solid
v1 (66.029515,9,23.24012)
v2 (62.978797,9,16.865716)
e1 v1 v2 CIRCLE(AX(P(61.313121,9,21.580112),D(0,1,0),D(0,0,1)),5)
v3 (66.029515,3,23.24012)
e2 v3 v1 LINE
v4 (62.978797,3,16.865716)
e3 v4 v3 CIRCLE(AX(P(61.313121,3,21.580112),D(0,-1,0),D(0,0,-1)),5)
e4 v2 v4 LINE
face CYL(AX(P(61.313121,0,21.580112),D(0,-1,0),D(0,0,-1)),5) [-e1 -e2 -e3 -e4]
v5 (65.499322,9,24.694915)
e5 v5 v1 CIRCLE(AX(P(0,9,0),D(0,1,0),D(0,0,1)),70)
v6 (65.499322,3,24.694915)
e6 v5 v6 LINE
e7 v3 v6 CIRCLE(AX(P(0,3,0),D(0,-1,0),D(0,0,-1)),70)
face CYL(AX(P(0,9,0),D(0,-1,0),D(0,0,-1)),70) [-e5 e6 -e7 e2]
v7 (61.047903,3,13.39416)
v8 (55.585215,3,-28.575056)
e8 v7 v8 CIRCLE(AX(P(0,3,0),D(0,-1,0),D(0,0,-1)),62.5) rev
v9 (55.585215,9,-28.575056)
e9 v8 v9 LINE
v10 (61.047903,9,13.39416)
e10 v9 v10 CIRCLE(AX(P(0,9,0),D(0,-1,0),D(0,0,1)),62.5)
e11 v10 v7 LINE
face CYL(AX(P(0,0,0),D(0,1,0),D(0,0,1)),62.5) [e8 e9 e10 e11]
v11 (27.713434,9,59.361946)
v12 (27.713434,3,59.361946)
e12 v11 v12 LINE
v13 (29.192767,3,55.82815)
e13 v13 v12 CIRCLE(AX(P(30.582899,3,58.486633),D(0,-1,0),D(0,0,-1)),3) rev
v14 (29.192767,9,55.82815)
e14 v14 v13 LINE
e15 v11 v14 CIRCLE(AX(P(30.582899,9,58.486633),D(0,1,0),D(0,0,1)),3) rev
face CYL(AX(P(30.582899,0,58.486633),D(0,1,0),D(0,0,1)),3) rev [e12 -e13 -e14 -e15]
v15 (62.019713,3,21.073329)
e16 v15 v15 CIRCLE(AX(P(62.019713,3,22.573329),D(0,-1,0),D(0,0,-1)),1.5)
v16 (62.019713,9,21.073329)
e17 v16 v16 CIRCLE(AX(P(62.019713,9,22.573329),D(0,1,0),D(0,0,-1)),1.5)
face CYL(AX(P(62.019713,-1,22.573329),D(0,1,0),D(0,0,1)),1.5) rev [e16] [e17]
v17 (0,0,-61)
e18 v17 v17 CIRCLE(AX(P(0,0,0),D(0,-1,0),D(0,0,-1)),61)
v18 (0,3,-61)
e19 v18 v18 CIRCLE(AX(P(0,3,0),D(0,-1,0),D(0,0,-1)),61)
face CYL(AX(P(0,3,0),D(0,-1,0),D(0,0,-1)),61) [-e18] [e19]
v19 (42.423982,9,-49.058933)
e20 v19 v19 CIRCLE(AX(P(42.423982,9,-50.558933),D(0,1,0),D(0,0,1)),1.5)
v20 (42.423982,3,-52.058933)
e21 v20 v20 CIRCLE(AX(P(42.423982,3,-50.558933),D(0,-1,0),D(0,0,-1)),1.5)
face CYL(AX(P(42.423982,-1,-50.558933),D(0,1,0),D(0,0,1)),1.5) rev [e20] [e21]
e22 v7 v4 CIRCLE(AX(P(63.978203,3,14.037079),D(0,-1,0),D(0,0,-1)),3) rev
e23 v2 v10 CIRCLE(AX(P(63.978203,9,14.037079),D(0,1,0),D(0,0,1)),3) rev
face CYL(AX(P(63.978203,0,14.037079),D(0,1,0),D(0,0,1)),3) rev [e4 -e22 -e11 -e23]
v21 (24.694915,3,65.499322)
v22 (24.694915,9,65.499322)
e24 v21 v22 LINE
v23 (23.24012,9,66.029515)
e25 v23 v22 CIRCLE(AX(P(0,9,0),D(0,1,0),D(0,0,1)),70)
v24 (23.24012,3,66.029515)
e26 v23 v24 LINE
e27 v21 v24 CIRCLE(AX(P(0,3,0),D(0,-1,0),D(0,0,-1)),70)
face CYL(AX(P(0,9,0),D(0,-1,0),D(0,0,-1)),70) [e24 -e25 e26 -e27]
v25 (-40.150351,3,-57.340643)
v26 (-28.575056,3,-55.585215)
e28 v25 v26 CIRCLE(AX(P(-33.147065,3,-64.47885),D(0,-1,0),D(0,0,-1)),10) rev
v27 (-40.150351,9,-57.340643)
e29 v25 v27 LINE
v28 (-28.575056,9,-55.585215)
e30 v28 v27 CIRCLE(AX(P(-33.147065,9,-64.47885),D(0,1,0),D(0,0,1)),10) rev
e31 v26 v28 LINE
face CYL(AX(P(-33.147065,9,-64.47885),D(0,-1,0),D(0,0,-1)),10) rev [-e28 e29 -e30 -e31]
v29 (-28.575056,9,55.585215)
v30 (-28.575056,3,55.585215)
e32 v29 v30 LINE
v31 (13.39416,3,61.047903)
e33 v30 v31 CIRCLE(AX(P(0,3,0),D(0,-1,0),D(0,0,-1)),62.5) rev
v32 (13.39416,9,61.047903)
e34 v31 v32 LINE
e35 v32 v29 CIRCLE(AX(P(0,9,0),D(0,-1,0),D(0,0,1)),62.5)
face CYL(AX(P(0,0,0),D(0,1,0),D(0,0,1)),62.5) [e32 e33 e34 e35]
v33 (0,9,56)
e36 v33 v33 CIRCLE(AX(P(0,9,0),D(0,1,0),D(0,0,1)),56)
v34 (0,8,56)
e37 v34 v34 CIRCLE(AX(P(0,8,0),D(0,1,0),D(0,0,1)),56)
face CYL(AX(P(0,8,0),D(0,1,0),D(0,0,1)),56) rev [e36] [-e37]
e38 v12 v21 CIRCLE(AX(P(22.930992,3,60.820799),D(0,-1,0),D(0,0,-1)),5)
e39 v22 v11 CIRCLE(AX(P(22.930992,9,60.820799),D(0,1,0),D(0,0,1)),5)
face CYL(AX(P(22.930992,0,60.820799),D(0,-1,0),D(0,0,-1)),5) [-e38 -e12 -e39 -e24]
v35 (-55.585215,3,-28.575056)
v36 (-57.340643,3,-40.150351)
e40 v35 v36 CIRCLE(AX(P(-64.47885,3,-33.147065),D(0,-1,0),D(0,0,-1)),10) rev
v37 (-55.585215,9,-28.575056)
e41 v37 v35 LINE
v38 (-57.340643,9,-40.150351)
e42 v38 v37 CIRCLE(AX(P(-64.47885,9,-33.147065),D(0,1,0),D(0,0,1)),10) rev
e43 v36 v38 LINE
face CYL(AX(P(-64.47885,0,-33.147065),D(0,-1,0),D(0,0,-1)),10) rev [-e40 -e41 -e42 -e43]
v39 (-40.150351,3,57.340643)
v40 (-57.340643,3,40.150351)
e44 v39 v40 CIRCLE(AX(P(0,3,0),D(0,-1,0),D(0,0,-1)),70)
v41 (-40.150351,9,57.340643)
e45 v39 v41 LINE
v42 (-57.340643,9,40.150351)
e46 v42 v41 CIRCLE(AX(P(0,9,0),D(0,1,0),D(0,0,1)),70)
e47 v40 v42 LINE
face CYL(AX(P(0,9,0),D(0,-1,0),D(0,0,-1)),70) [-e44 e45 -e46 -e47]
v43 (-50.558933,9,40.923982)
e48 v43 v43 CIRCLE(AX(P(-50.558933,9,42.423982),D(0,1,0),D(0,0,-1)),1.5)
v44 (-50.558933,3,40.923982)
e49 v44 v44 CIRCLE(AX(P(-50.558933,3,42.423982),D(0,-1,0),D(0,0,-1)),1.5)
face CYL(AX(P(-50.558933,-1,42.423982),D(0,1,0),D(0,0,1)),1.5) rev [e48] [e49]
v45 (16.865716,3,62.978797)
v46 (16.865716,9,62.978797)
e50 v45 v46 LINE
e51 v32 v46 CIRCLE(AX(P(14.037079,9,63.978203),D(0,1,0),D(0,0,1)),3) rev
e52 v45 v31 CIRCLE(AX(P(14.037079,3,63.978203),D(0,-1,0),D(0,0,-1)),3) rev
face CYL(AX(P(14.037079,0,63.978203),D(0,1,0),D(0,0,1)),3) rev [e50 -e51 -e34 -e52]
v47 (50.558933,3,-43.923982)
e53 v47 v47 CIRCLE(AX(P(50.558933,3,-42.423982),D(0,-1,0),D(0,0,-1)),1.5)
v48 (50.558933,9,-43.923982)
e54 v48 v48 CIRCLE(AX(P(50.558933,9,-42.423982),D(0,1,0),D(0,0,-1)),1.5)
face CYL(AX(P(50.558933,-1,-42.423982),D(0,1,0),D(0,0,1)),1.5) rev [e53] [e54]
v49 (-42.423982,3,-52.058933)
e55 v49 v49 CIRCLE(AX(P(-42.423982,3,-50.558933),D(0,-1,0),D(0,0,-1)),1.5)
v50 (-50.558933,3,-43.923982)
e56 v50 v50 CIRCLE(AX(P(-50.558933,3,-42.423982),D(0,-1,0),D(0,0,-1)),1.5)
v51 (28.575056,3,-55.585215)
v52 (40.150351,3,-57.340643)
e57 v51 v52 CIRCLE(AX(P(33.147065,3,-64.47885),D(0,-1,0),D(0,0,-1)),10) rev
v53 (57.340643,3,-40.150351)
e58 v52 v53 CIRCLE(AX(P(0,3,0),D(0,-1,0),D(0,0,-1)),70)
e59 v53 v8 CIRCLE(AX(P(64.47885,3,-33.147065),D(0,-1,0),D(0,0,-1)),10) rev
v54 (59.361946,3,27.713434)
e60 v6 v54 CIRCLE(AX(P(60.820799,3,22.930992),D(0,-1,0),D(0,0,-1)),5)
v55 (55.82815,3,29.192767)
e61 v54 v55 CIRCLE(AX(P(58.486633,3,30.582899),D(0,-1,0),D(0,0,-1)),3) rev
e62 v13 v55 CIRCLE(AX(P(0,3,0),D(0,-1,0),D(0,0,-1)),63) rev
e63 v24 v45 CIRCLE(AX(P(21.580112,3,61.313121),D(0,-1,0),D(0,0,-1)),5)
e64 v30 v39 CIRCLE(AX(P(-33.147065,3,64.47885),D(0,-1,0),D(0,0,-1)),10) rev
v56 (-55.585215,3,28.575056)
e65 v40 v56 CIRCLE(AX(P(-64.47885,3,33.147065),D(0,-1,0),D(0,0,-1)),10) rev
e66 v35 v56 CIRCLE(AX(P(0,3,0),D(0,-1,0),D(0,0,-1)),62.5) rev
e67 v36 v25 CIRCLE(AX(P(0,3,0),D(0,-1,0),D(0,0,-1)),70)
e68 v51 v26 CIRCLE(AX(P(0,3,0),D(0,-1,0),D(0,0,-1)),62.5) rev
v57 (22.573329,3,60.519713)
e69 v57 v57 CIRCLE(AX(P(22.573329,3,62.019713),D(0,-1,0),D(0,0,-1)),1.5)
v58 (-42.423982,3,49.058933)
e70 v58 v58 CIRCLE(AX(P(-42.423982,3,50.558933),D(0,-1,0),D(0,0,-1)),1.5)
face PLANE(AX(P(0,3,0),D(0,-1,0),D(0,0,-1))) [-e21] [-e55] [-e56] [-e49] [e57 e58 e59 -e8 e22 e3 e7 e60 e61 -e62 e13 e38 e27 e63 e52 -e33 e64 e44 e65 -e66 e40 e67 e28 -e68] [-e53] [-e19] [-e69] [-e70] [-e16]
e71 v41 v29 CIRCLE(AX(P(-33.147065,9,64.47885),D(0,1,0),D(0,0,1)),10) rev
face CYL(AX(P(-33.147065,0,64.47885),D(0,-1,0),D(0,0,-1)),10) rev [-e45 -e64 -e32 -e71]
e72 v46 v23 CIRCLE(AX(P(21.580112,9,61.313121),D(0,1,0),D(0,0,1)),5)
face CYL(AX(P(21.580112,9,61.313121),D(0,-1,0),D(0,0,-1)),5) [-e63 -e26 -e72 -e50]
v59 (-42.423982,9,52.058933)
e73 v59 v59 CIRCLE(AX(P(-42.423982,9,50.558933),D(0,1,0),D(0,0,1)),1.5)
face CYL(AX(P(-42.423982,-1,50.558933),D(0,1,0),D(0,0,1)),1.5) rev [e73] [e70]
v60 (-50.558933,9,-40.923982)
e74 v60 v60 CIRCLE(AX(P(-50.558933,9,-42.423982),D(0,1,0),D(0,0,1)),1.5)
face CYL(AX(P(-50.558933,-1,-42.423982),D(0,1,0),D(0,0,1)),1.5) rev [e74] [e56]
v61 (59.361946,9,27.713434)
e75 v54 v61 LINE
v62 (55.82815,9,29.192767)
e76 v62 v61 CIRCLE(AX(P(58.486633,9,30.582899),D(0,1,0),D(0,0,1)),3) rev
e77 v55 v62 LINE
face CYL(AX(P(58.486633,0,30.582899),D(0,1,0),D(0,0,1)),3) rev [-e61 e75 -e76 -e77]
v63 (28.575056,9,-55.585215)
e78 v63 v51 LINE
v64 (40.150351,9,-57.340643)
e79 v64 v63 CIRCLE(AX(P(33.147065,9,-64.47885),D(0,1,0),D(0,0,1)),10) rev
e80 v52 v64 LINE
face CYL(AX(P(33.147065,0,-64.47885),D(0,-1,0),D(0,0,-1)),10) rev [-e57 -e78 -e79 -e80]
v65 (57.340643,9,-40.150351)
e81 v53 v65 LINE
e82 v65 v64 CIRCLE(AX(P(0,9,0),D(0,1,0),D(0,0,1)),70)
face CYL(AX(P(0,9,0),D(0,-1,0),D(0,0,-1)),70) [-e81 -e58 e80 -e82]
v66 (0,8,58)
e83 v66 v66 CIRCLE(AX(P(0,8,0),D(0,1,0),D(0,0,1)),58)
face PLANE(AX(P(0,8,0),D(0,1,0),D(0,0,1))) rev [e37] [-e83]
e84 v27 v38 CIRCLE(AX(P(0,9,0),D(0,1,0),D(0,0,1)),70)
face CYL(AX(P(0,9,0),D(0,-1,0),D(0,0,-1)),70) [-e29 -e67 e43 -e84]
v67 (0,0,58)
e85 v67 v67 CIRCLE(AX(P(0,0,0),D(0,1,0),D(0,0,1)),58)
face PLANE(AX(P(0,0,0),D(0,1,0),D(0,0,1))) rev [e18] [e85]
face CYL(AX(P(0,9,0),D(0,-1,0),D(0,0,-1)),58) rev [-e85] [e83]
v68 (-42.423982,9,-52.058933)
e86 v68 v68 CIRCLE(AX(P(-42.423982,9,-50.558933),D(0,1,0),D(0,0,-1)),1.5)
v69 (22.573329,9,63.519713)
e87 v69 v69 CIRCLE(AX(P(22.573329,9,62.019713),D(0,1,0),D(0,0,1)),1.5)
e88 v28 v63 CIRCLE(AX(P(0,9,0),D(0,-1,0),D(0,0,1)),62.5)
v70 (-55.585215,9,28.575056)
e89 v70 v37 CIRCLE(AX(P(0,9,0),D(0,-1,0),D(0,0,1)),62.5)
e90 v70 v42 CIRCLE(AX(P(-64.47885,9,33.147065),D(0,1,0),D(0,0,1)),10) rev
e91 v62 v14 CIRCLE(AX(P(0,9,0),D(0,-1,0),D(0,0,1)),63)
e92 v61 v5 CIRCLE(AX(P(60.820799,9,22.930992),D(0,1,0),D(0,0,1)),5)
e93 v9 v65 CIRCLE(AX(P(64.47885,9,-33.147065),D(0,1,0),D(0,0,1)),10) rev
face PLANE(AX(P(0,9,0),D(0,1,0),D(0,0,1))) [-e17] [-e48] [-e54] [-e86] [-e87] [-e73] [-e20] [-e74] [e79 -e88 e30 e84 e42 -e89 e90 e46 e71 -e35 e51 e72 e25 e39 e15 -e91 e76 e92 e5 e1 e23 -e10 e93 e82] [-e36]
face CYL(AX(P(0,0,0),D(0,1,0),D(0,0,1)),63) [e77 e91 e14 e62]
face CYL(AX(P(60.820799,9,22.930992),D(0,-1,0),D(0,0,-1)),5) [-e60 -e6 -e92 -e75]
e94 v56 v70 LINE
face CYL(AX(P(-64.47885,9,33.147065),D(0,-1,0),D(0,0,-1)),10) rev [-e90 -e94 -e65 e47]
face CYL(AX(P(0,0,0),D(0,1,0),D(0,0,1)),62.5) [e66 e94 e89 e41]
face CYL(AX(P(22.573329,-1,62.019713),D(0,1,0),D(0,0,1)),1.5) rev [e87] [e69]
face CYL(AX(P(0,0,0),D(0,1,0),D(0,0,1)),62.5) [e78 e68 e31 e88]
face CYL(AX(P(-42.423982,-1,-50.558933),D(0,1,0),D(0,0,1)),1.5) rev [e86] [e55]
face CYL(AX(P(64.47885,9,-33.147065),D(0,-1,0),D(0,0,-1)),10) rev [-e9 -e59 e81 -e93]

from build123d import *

# Parameters (mm, degrees)
SKETCH_1_R          = 70
SKETCH_1_R_2        = 58
EXTRUDE_1_DEPTH     = 9
SKETCH_3_R          = 70
SKETCH_3_R_2        = 61
CUT_EXTRUDE_2_DEPTH = 3
CUT_EXTRUDE_3_DEPTH = 100.403219264
FILLET_1_R          = 10
CUT_EXTRUDE_6_DEPTH = 97.044388064
FILLET_7_R          = 3
SKETCH_6_R          = 1.5
CUT_EXTRUDE_4_DEPTH = 10
FILLET_9_R          = 5
EXTRUDE_START       = -1
SKETCH_9_R          = 58
SKETCH_9_R_2        = 56
EXTRUDE_2_DEPTH     = 1


with BuildPart() as part:
    # 草图1 → 凸台-拉伸1 (new body)
    with BuildSketch(Plane(origin=(0, 0, 0), x_dir=(1, 0, 0), z_dir=(0, 1, 0))):
        with Locations(Location((0, 0, 0), (0, 0, 270))):
            Circle(SKETCH_1_R)
        with Locations(Location((0, 0, 0), (0, 0, 270))):
            Circle(SKETCH_1_R_2, mode=Mode.SUBTRACT)
    extrude(amount=EXTRUDE_1_DEPTH)

    # 草图3 → 切除-拉伸2 (cut)
    with BuildSketch(Plane.XZ):
        with Locations(Location((0, 0, 0), (0, 0, 270))):
            Circle(SKETCH_3_R)
        with Locations(Location((0, 0, 0), (0, 0, 270))):
            Circle(SKETCH_3_R_2, mode=Mode.SUBTRACT)
    extrude(amount=-CUT_EXTRUDE_2_DEPTH, mode=Mode.SUBTRACT)

    # 草图4 → 切除-拉伸3 (cut, through all)
    with BuildSketch(Plane(origin=(0, 9, 0), x_dir=(1, 0, 0), z_dir=(0, 1, 0))):
        with BuildLine():
            Line((35.848527272, 51.197002768), (40.150350545, 57.3406431))
            ThreePointArc((40.150350545, 57.3406431), (0, 70), (-40.150350545, 57.3406431))
            Line((-40.150350545, 57.3406431), (-35.848527272, 51.197002768))
            ThreePointArc((-35.848527272, 51.197002768), (0, 62.5), (35.848527272, 51.197002768))
        make_face()
        with BuildLine():
            Line((51.197002768, 35.848527272), (57.3406431, 40.150350545))
            ThreePointArc((57.3406431, 40.150350545), (68.936542711, 12.155372437), (67.61480784, -18.117333157))
            Line((67.61480784, -18.117333157), (60.370364143, -16.176190319))
            ThreePointArc((60.370364143, -16.176190319), (61.550484563, 10.853011104), (51.197002768, 35.848527272))
        make_face()
        with BuildLine():
            Line((16.176190319, -60.370364143), (18.117333157, -67.61480784))
            ThreePointArc((18.117333157, -67.61480784), (-12.155372437, -68.936542711), (-40.150350545, -57.3406431))
            Line((-40.150350545, -57.3406431), (-35.848527272, -51.197002768))
            ThreePointArc((-35.848527272, -51.197002768), (-10.853011104, -61.550484563), (16.176190319, -60.370364143))
        make_face()
        with BuildLine():
            Line((-51.197002768, -35.848527272), (-57.3406431, -40.150350545))
            ThreePointArc((-57.3406431, -40.150350545), (-70, 0), (-57.3406431, 40.150350545))
            Line((-57.3406431, 40.150350545), (-51.197002768, 35.848527272))
            ThreePointArc((-51.197002768, 35.848527272), (-62.5, 0), (-51.197002768, -35.848527272))
        make_face()
    extrude(amount=-CUT_EXTRUDE_3_DEPTH, mode=Mode.SUBTRACT)

    # 圆角1
    # the kernel refuses this fillet: 10 mm, written as the material it adds along each edge
    with BuildSketch(Plane(origin=(-51.197002768, 9, 35.848527272), x_dir=(-0.8191520442890221, 0, 0.5735764363510029), z_dir=(0, -1, 0)), Plane(origin=(51.197002768, 9, -35.848527272), x_dir=(0.8191520442890228, 0, -0.5735764363510018), z_dir=(0, -1, 0)), Plane(origin=(-35.848527272, 9, -51.197002768), x_dir=(-0.5735764363510008, 0, -0.8191520442890236), z_dir=(0, -1, 0))) as fillet_1_piece_1:
        with BuildLine():
            CenterArc((9.330357143, 9.831062645), FILLET_1_R, 187.793366371, 71.660001872)
            Line((-0.577278325, 8.475054004), (-0.775431034, 8.447933831))
            ThreePointArc((-0.775431034, 8.447933831), (-0.344024235, 4.233754448), (-0.2, 0))
            Line((-0.2, 0), (0, -0.2))
            ThreePointArc((0, -0.2), (3.75, -0.2), (7.463392857, -0.196621253))
            Line((7.463392857, -0.196621253), (7.5, 0))
        make_face()
    extrude(amount=6)
    with BuildSketch(Plane(origin=(-35.848527272, 9, 51.197002768), x_dir=(-0.5735764363510476, 0, 0.8191520442889907), z_dir=(0, -1, 0))) as fillet_1_piece_2:
        with BuildLine():
            CenterArc((9.330357143, -9.831062645), FILLET_1_R, 100.546631757, 71.660001872)
            Line((-0.577278325, -8.475054004), (-0.775431034, -8.447933831))
            ThreePointArc((-0.775431034, -8.447933831), (-0.344024235, -4.233754448), (-0.2, 0))
            Line((-0.2, 0), (0, 0.2))
            ThreePointArc((0, 0.2), (3.75, 0.2), (7.463392857, 0.196621253))
            Line((7.463392857, 0.196621253), (7.5, 0))
        make_face()
    extrude(amount=6)
    with BuildSketch(Plane(origin=(35.848527272, 9, -51.197002768), x_dir=(-0.8562371813975653, 0, -0.5165828967284464), z_dir=(0, -1, 0)), Plane(origin=(-51.197002768, 9, -35.848527272), x_dir=(-0.5165828967284464, 0, 0.8562371813975653), z_dir=(0, -1, 0))) as fillet_1_piece_3:
        with BuildLine():
            CenterArc((9.174267262, 9.976882145), FILLET_1_R, 194.443314943, 71.660001872)
            Line((-0.509681515, 7.482661609), (-0.70336049, 7.432777198))
            ThreePointArc((-0.70336049, 7.432777198), (-0.4543784, 3.727739297), (-0.199537643, -0.013591507))
            Line((-0.199537643, -0.013591507), (0.013591507, -0.199537643))
            ThreePointArc((0.013591507, -0.199537643), (4.247345955, -0.055513408), (8.481100403, -0.199537643))
            Line((8.481100403, -0.199537643), (8.49469191, 0))
        make_face()
    extrude(amount=6)

    # 草图8 → 切除-拉伸6 (cut, through all)
    with BuildSketch(Plane(origin=(0, 9, 0), x_dir=(1, 0, 0), z_dir=(0, 1, 0))):
        with BuildLine():
            Line((26.62495049, -57.097390583), (29.583278322, -63.441545093))
            ThreePointArc((29.583278322, -63.441545093), (49.497474683, -49.497474683), (63.441545093, -29.583278322))
            Line((63.441545093, -29.583278322), (57.097390583, -26.62495049))
            ThreePointArc((57.097390583, -26.62495049), (44.547727215, -44.547727215), (26.62495049, -57.097390583))
        make_face()
    extrude(amount=-CUT_EXTRUDE_6_DEPTH, mode=Mode.SUBTRACT)

    # 圆角7
    fillet_7_edges = [part.edges().sort_by_distance(p)[0] for p in [
        (26.62495049, 6, 57.097390583),
        (57.097390583, 6, 26.62495049),
        (60.370364143, 6, 16.176190319),
        (16.176190319, 6, 60.370364143),
    ]]
    fillet(fillet_7_edges, radius=FILLET_7_R)

    # 草图6 → 切除-拉伸4 (cut)
    with BuildSketch(Plane(origin=(0, 9, 0), x_dir=(1, 0, 0), z_dir=(0, 1, 0))):
        with Locations(Location((42.423982239, 50.558933246, 0), (0, 0, 270))):
            Circle(SKETCH_6_R)
        with Locations(Location((-42.423982239, -50.558933246, 0), (0, 0, 270))):
            Circle(SKETCH_6_R)
        with Locations(Location((-50.558933246, 42.423982239, 0), (0, 0, 270))):
            Circle(SKETCH_6_R)
        with Locations(Location((50.558933246, 42.423982239, 0), (0, 0, 90))):
            Circle(SKETCH_6_R)
        with Locations(Location((-50.558933246, -42.423982239, 0), (0, 0, 90))):
            Circle(SKETCH_6_R)
        with Locations(Location((-42.423982239, 50.558933246, 0), (0, 0, 90))):
            Circle(SKETCH_6_R)
        with Locations(Location((22.573329459, -62.019712972, 0), (0, 0, 270))):
            Circle(SKETCH_6_R)
        with Locations(Location((62.019712972, -22.573329459, 0), (0, 0, 90))):
            Circle(SKETCH_6_R)
    extrude(amount=-CUT_EXTRUDE_4_DEPTH, mode=Mode.SUBTRACT)

    # 圆角9
    fillet_9_edges = [part.edges().sort_by_distance(p)[0] for p in [
        (67.61480784, 6, 18.117333157),
        (63.441545093, 6, 29.583278322),
        (18.117333157, 6, 67.61480784),
        (29.583278322, 6, 63.441545093),
    ]]
    fillet(fillet_9_edges, radius=FILLET_9_R)

    # 草图9 → 凸台-拉伸2 (add)
    with BuildSketch(Plane(origin=(0, 9, 0), x_dir=(1, 0, 0), z_dir=(0, 1, 0)).offset(EXTRUDE_START)):
        with Locations(Location((0, 0, 0), (0, 0, 270))):
            Circle(SKETCH_9_R)
        with Locations(Location((0, 0, 0), (0, 0, 270))):
            Circle(SKETCH_9_R_2, mode=Mode.SUBTRACT)
    extrude(amount=EXTRUDE_2_DEPTH)


solid = part.part
